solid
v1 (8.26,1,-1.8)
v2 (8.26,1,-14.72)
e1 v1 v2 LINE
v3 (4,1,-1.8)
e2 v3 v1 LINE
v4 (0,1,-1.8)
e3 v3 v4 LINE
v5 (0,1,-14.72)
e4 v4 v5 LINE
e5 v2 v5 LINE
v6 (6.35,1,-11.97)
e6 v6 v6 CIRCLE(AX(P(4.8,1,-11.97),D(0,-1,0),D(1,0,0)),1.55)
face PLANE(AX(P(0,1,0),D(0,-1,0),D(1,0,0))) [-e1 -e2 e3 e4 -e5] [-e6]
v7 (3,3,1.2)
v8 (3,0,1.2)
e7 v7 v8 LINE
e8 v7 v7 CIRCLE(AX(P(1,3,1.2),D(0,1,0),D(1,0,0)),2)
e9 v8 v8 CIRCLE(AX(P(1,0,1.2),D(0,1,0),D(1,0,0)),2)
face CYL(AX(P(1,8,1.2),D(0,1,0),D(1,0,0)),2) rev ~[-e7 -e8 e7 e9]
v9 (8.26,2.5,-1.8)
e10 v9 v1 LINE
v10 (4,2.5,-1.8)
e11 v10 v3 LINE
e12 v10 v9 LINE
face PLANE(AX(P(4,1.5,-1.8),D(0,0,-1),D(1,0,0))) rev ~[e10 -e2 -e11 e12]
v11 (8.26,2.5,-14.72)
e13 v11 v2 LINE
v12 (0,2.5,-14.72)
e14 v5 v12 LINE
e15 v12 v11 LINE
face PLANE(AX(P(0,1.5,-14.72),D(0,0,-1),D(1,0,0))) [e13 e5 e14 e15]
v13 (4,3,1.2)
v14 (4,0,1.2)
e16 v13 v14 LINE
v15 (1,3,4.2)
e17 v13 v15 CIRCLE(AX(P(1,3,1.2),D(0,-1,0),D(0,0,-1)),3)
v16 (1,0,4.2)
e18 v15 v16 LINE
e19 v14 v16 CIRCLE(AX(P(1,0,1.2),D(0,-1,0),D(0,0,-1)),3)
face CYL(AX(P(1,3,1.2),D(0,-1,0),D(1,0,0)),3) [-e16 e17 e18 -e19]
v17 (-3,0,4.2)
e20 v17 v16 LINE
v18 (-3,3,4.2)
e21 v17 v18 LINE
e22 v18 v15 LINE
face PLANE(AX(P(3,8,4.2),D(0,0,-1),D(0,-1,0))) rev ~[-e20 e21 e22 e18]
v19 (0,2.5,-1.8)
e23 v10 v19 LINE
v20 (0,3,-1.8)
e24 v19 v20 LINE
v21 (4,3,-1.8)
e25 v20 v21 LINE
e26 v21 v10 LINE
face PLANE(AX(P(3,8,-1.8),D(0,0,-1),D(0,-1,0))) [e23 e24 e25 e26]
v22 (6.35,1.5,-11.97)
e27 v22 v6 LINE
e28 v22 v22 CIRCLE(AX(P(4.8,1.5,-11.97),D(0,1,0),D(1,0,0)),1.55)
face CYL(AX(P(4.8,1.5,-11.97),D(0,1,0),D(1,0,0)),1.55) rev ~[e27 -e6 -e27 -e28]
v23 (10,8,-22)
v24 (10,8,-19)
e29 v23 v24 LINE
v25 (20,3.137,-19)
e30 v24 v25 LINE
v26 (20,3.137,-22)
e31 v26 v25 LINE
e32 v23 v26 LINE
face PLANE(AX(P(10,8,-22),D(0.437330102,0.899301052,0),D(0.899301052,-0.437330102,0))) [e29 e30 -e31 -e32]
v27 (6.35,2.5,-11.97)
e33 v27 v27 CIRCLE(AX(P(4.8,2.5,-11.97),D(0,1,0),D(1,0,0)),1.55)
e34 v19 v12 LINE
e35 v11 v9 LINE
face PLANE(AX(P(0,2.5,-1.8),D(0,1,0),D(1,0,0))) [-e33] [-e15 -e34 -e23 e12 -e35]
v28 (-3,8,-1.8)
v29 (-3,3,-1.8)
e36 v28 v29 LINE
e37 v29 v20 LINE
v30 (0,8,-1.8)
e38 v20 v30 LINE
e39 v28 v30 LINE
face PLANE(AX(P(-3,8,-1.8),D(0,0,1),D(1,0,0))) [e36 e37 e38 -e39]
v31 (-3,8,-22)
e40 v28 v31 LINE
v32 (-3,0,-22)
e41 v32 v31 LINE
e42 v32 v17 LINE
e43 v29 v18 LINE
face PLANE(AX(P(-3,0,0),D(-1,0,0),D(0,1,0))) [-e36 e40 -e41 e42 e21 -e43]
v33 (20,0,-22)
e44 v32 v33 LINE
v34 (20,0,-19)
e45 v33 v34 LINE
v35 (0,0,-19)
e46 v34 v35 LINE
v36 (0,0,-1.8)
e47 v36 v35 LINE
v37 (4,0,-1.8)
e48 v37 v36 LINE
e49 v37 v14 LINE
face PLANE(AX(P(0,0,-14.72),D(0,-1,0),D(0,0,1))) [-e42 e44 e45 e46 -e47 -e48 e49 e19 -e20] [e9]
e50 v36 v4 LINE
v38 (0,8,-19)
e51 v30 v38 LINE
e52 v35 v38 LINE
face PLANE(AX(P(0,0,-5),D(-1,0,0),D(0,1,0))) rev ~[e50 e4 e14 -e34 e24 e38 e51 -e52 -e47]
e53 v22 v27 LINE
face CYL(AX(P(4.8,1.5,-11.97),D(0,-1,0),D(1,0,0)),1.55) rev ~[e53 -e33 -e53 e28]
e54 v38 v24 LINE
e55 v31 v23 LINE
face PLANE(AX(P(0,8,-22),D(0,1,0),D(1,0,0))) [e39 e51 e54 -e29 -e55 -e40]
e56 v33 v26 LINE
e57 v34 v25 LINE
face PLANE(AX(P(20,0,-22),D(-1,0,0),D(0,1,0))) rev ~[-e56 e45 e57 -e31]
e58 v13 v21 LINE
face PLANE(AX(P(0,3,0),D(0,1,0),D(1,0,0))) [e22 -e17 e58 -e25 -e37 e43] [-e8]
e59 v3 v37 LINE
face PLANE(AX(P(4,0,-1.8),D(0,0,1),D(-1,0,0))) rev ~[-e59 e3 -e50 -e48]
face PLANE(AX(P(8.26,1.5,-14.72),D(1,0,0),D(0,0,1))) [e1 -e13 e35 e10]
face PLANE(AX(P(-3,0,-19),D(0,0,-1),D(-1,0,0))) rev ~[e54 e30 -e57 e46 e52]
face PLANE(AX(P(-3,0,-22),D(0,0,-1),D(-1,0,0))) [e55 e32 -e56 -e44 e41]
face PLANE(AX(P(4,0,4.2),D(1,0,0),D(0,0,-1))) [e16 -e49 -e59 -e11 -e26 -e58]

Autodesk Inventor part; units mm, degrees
ref_plane "YZ Plane" through (0, 0, 0) normal (1, 0, 0) x (0, 1, 0)
ref_plane "XZ Plane" through (0, 0, 0) normal (0, 1, 0) x (-1, 0, 0)
ref_plane "XY Plane" through (0, 0, 0) normal (0, 0, 1) x (1, 0, 0)
sketch "Szkic1" plane through (0, 0, 0) normal (0, 1, 0) x (-1, 0, 0)
  line L0 (0, 0) -> (3, 0)
  line L1 (3, 0) -> (3, -22)
  line L2 (3, -22) -> (0, -22)
  line L3 (0, -22) -> (0, 0)
  line L4 (0, 0) -> (-3, 0)
  line L5 (-3, 0) -> (-3, -5)
  line L6 (-3, -5) -> (0, -5)
  line L7 (0, -5) -> (0, 0)
  line L8 (0, -22) -> (-20, -22)
  line L9 (-20, -22) -> (-20, -19)
  line L10 (-20, -19) -> (0, -19)
  line L11 (0, -19) -> (0, -22)
  dimension "d0" = 3
  dimension "d1" = 22
  dimension "d2" = 3
  dimension "d3" = 5
  dimension "d4" = 20
  dimension "d5" = 3
extrude "Wyciągnięcie proste1" add sketch "Szkic1" along normal blind 8
sketch "Szkic2" plane through (0, 0, -19) normal (0, 0, 1) x (1, 0, 0)
  line L0 (20, 0) -> (20, 8) projected
  line L1 (20, 0) -> (0, 8)
  line L2 (20, 8) -> (-3, 8) projected
  point P0 (0, 0)
extrude "Wyciągnięcie proste2" cut sketch "Szkic2" against normal blind 3
sketch "Szkic3" plane through (-3, 0, 0) normal (0, 0, 1) x (1, 0, 0)
  line L0 (0, 0) -> (0, 8) projected
  line L1 (0, 0) -> (6, 0)
  line L2 (6, 0) -> (6, 8)
  line L3 (6, 8) -> (0, 8)
  line L4 (0, 8) -> (0, 0)
  point P0 (3, 0)
extrude "Wyciągnięcie proste3" add sketch "Szkic3" along normal blind 4.2
sketch "Szkic4" plane through (3, 0, -5) normal (0, 0, -1) x (-1, 0, 0)
  line L0 (0, 0) -> (0, 8) projected
  line L1 (3, 0) -> (3, 8) projected
  line L2 (0, 8) -> (3, 8)
  line L3 (3, 8) -> (3, 0)
  line L4 (3, 0) -> (0, 0)
  line L5 (0, 0) -> (0, 8)
extrude "Wyciągnięcie proste4" cut sketch "Szkic4" against normal blind 3.2
sketch "Szkic6" plane through (3, 0, 4.2) normal (1, 0, 0) x (0, 0, -1)
  line L0 (0, 8) -> (0, 0) projected
  line L1 (23.2, 0) -> (6, 0) projected
  line L2 (0, 8) -> (6, 8)
  line L3 (6, 8) -> (6, 0)
  line L4 (6, 0) -> (0, 0)
  line L5 (0, 0) -> (0, 8)
  point P0 (4.2, 0)
extrude "Wyciągnięcie proste7" add sketch "Szkic6" along normal blind 2
sketch "Szkic7" plane through (0, 8, 0) normal (0, 1, 0) x (1, 0, 0)
  circle A0 centre (1, -1.2) radius 2
  line L0 (5, 1.8) -> (5, -4.2) projected
  line L1 (-3, -4.2) -> (5, -4.2) projected
  line L2 (-3, 22) -> (-3, -4.2) projected
  line L3 (5, -4.2) -> (-3, -4.2)
  line L4 (-3, -4.2) -> (-3, 1.8)
  line L5 (-3, 1.8) -> (5, 1.8)
  line L6 (5, 1.8) -> (5, -4.2)
  point P0 (0, 0)
  dimension "d23" = 4
  dimension "d24" = 4
  dimension "d25" = 3
extrude "Wyciągnięcie proste8" cut sketch "Szkic7" against normal blind 8 contours A0
extrude "Wyciągnięcie proste9" cut sketch "Szkic7" against normal blind 5 contours A0 | L0 L1 L2 L5
sketch "Szkic8" plane through (5, 0, 4.2) normal (1, 0, 0) x (0, 0, -1)
  line L0 (0, 3) -> (0, 0) projected
  line L1 (23.2, 0) -> (6, 0) projected
  line L2 (0, 3) -> (6, 3)
  line L3 (6, 3) -> (6, 0)
  line L4 (6, 0) -> (0, 0)
  line L5 (0, 0) -> (0, 3)
  point P0 (4.2, 0)
extrude "Wyciągnięcie proste10" cut sketch "Szkic8" against normal blind 1
sketch "Szkic9" plane through (-3, 0, -22) normal (0, 0, -1) x (-1, 0, 0)
  line L0 (-3, 8) -> (-23, 0) projected
  line L1 (-23, 0) -> (-23, 3.137)
  line L2 (-3, 8) -> (-13, 8)
  line L3 (-13, 8) -> (-23, 3.137)
  point P0 (-3, 0)
  dimension "d32" = 3.137
extrude "Wyciągnięcie proste11" add sketch "Szkic9" against normal blind 3
sketch "Szkic10" plane through (0, 0, -19) normal (1, 0, 0) x (0, 0, -1)
  line L0 (0, 0) -> (-17.2, 0) projected
  line L1 (-17.2, 0) -> (-4.28, 0)
  line L2 (-4.28, 0) -> (-4.28, 1.5)
  line L3 (-4.28, 1.5) -> (-17.2, 1.5)
  line L4 (-17.2, 1.5) -> (-17.2, 0)
  point P0 (-19, 0)
  point P1 (-4.28, 0)
  dimension "d35" = 12.92
  dimension "d36" = 1.5
extrude "Wyciągnięcie proste12" add sketch "Szkic10" along normal blind 8.26
sketch "Szkic11" plane through (0, 1.5, -1.8) normal (0, 1, 0) x (1, 0, 0)
  circle A0 centre (4.8, 10.17) radius 1.55
  line L0 (4, 0) -> (8.26, 0) projected
  line L1 (0, 0) -> (0, 17.2) projected
  point P0 (0, -1.8)
  dimension "d39" = 3.1
  dimension "d40" = 10.17
  dimension "d41" = 4.8
extrude "Wyciągnięcie proste13" cut sketch "Szkic11" against normal blind 2
fillet "Fillet1" radius 3 1 edges at (4, 1.5, 4.2)
sketch "Szkic12" plane through (0, 1.5, -1.8) normal (0, 1, 0) x (1, 0, 0)
  circle A0 centre (4.8, 10.17) radius 1.55 projected
  line L0 (0, 0) -> (0, 12.92) projected
  line L1 (4, 0) -> (0, 0) projected
  line L2 (4, 0) -> (8.26, 0) projected
  line L3 (8.26, 12.92) -> (8.26, 0) projected
  line L4 (0, 12.92) -> (8.26, 12.92) projected
  point P0 (0, -1.8)
extrude "Wyciągnięcie proste14" add sketch "Szkic12" along normal blind 1
sketch "Szkic13" plane through (0, 0, 0) normal (0, -1, 0) x (1, 0, 0)
  line L0 (8.26, -1.8) -> (8.26, -14.72) projected
  line L1 (8.26, -14.72) -> (0, -14.72) projected
  line L2 (0, -1.8) -> (0, -14.72) projected
  line L3 (4, -1.8) -> (0, -1.8) projected
  line L4 (4, -1.8) -> (8.26, -1.8) projected
  circle A0 centre (4.8, -11.97) radius 1.55 projected
  point P0 (0, 0)
extrude "Wyciągnięcie proste15" cut sketch "Szkic13" against normal blind 1
properties part number "rfmw" material "Tworzywo sztuczne PET"
